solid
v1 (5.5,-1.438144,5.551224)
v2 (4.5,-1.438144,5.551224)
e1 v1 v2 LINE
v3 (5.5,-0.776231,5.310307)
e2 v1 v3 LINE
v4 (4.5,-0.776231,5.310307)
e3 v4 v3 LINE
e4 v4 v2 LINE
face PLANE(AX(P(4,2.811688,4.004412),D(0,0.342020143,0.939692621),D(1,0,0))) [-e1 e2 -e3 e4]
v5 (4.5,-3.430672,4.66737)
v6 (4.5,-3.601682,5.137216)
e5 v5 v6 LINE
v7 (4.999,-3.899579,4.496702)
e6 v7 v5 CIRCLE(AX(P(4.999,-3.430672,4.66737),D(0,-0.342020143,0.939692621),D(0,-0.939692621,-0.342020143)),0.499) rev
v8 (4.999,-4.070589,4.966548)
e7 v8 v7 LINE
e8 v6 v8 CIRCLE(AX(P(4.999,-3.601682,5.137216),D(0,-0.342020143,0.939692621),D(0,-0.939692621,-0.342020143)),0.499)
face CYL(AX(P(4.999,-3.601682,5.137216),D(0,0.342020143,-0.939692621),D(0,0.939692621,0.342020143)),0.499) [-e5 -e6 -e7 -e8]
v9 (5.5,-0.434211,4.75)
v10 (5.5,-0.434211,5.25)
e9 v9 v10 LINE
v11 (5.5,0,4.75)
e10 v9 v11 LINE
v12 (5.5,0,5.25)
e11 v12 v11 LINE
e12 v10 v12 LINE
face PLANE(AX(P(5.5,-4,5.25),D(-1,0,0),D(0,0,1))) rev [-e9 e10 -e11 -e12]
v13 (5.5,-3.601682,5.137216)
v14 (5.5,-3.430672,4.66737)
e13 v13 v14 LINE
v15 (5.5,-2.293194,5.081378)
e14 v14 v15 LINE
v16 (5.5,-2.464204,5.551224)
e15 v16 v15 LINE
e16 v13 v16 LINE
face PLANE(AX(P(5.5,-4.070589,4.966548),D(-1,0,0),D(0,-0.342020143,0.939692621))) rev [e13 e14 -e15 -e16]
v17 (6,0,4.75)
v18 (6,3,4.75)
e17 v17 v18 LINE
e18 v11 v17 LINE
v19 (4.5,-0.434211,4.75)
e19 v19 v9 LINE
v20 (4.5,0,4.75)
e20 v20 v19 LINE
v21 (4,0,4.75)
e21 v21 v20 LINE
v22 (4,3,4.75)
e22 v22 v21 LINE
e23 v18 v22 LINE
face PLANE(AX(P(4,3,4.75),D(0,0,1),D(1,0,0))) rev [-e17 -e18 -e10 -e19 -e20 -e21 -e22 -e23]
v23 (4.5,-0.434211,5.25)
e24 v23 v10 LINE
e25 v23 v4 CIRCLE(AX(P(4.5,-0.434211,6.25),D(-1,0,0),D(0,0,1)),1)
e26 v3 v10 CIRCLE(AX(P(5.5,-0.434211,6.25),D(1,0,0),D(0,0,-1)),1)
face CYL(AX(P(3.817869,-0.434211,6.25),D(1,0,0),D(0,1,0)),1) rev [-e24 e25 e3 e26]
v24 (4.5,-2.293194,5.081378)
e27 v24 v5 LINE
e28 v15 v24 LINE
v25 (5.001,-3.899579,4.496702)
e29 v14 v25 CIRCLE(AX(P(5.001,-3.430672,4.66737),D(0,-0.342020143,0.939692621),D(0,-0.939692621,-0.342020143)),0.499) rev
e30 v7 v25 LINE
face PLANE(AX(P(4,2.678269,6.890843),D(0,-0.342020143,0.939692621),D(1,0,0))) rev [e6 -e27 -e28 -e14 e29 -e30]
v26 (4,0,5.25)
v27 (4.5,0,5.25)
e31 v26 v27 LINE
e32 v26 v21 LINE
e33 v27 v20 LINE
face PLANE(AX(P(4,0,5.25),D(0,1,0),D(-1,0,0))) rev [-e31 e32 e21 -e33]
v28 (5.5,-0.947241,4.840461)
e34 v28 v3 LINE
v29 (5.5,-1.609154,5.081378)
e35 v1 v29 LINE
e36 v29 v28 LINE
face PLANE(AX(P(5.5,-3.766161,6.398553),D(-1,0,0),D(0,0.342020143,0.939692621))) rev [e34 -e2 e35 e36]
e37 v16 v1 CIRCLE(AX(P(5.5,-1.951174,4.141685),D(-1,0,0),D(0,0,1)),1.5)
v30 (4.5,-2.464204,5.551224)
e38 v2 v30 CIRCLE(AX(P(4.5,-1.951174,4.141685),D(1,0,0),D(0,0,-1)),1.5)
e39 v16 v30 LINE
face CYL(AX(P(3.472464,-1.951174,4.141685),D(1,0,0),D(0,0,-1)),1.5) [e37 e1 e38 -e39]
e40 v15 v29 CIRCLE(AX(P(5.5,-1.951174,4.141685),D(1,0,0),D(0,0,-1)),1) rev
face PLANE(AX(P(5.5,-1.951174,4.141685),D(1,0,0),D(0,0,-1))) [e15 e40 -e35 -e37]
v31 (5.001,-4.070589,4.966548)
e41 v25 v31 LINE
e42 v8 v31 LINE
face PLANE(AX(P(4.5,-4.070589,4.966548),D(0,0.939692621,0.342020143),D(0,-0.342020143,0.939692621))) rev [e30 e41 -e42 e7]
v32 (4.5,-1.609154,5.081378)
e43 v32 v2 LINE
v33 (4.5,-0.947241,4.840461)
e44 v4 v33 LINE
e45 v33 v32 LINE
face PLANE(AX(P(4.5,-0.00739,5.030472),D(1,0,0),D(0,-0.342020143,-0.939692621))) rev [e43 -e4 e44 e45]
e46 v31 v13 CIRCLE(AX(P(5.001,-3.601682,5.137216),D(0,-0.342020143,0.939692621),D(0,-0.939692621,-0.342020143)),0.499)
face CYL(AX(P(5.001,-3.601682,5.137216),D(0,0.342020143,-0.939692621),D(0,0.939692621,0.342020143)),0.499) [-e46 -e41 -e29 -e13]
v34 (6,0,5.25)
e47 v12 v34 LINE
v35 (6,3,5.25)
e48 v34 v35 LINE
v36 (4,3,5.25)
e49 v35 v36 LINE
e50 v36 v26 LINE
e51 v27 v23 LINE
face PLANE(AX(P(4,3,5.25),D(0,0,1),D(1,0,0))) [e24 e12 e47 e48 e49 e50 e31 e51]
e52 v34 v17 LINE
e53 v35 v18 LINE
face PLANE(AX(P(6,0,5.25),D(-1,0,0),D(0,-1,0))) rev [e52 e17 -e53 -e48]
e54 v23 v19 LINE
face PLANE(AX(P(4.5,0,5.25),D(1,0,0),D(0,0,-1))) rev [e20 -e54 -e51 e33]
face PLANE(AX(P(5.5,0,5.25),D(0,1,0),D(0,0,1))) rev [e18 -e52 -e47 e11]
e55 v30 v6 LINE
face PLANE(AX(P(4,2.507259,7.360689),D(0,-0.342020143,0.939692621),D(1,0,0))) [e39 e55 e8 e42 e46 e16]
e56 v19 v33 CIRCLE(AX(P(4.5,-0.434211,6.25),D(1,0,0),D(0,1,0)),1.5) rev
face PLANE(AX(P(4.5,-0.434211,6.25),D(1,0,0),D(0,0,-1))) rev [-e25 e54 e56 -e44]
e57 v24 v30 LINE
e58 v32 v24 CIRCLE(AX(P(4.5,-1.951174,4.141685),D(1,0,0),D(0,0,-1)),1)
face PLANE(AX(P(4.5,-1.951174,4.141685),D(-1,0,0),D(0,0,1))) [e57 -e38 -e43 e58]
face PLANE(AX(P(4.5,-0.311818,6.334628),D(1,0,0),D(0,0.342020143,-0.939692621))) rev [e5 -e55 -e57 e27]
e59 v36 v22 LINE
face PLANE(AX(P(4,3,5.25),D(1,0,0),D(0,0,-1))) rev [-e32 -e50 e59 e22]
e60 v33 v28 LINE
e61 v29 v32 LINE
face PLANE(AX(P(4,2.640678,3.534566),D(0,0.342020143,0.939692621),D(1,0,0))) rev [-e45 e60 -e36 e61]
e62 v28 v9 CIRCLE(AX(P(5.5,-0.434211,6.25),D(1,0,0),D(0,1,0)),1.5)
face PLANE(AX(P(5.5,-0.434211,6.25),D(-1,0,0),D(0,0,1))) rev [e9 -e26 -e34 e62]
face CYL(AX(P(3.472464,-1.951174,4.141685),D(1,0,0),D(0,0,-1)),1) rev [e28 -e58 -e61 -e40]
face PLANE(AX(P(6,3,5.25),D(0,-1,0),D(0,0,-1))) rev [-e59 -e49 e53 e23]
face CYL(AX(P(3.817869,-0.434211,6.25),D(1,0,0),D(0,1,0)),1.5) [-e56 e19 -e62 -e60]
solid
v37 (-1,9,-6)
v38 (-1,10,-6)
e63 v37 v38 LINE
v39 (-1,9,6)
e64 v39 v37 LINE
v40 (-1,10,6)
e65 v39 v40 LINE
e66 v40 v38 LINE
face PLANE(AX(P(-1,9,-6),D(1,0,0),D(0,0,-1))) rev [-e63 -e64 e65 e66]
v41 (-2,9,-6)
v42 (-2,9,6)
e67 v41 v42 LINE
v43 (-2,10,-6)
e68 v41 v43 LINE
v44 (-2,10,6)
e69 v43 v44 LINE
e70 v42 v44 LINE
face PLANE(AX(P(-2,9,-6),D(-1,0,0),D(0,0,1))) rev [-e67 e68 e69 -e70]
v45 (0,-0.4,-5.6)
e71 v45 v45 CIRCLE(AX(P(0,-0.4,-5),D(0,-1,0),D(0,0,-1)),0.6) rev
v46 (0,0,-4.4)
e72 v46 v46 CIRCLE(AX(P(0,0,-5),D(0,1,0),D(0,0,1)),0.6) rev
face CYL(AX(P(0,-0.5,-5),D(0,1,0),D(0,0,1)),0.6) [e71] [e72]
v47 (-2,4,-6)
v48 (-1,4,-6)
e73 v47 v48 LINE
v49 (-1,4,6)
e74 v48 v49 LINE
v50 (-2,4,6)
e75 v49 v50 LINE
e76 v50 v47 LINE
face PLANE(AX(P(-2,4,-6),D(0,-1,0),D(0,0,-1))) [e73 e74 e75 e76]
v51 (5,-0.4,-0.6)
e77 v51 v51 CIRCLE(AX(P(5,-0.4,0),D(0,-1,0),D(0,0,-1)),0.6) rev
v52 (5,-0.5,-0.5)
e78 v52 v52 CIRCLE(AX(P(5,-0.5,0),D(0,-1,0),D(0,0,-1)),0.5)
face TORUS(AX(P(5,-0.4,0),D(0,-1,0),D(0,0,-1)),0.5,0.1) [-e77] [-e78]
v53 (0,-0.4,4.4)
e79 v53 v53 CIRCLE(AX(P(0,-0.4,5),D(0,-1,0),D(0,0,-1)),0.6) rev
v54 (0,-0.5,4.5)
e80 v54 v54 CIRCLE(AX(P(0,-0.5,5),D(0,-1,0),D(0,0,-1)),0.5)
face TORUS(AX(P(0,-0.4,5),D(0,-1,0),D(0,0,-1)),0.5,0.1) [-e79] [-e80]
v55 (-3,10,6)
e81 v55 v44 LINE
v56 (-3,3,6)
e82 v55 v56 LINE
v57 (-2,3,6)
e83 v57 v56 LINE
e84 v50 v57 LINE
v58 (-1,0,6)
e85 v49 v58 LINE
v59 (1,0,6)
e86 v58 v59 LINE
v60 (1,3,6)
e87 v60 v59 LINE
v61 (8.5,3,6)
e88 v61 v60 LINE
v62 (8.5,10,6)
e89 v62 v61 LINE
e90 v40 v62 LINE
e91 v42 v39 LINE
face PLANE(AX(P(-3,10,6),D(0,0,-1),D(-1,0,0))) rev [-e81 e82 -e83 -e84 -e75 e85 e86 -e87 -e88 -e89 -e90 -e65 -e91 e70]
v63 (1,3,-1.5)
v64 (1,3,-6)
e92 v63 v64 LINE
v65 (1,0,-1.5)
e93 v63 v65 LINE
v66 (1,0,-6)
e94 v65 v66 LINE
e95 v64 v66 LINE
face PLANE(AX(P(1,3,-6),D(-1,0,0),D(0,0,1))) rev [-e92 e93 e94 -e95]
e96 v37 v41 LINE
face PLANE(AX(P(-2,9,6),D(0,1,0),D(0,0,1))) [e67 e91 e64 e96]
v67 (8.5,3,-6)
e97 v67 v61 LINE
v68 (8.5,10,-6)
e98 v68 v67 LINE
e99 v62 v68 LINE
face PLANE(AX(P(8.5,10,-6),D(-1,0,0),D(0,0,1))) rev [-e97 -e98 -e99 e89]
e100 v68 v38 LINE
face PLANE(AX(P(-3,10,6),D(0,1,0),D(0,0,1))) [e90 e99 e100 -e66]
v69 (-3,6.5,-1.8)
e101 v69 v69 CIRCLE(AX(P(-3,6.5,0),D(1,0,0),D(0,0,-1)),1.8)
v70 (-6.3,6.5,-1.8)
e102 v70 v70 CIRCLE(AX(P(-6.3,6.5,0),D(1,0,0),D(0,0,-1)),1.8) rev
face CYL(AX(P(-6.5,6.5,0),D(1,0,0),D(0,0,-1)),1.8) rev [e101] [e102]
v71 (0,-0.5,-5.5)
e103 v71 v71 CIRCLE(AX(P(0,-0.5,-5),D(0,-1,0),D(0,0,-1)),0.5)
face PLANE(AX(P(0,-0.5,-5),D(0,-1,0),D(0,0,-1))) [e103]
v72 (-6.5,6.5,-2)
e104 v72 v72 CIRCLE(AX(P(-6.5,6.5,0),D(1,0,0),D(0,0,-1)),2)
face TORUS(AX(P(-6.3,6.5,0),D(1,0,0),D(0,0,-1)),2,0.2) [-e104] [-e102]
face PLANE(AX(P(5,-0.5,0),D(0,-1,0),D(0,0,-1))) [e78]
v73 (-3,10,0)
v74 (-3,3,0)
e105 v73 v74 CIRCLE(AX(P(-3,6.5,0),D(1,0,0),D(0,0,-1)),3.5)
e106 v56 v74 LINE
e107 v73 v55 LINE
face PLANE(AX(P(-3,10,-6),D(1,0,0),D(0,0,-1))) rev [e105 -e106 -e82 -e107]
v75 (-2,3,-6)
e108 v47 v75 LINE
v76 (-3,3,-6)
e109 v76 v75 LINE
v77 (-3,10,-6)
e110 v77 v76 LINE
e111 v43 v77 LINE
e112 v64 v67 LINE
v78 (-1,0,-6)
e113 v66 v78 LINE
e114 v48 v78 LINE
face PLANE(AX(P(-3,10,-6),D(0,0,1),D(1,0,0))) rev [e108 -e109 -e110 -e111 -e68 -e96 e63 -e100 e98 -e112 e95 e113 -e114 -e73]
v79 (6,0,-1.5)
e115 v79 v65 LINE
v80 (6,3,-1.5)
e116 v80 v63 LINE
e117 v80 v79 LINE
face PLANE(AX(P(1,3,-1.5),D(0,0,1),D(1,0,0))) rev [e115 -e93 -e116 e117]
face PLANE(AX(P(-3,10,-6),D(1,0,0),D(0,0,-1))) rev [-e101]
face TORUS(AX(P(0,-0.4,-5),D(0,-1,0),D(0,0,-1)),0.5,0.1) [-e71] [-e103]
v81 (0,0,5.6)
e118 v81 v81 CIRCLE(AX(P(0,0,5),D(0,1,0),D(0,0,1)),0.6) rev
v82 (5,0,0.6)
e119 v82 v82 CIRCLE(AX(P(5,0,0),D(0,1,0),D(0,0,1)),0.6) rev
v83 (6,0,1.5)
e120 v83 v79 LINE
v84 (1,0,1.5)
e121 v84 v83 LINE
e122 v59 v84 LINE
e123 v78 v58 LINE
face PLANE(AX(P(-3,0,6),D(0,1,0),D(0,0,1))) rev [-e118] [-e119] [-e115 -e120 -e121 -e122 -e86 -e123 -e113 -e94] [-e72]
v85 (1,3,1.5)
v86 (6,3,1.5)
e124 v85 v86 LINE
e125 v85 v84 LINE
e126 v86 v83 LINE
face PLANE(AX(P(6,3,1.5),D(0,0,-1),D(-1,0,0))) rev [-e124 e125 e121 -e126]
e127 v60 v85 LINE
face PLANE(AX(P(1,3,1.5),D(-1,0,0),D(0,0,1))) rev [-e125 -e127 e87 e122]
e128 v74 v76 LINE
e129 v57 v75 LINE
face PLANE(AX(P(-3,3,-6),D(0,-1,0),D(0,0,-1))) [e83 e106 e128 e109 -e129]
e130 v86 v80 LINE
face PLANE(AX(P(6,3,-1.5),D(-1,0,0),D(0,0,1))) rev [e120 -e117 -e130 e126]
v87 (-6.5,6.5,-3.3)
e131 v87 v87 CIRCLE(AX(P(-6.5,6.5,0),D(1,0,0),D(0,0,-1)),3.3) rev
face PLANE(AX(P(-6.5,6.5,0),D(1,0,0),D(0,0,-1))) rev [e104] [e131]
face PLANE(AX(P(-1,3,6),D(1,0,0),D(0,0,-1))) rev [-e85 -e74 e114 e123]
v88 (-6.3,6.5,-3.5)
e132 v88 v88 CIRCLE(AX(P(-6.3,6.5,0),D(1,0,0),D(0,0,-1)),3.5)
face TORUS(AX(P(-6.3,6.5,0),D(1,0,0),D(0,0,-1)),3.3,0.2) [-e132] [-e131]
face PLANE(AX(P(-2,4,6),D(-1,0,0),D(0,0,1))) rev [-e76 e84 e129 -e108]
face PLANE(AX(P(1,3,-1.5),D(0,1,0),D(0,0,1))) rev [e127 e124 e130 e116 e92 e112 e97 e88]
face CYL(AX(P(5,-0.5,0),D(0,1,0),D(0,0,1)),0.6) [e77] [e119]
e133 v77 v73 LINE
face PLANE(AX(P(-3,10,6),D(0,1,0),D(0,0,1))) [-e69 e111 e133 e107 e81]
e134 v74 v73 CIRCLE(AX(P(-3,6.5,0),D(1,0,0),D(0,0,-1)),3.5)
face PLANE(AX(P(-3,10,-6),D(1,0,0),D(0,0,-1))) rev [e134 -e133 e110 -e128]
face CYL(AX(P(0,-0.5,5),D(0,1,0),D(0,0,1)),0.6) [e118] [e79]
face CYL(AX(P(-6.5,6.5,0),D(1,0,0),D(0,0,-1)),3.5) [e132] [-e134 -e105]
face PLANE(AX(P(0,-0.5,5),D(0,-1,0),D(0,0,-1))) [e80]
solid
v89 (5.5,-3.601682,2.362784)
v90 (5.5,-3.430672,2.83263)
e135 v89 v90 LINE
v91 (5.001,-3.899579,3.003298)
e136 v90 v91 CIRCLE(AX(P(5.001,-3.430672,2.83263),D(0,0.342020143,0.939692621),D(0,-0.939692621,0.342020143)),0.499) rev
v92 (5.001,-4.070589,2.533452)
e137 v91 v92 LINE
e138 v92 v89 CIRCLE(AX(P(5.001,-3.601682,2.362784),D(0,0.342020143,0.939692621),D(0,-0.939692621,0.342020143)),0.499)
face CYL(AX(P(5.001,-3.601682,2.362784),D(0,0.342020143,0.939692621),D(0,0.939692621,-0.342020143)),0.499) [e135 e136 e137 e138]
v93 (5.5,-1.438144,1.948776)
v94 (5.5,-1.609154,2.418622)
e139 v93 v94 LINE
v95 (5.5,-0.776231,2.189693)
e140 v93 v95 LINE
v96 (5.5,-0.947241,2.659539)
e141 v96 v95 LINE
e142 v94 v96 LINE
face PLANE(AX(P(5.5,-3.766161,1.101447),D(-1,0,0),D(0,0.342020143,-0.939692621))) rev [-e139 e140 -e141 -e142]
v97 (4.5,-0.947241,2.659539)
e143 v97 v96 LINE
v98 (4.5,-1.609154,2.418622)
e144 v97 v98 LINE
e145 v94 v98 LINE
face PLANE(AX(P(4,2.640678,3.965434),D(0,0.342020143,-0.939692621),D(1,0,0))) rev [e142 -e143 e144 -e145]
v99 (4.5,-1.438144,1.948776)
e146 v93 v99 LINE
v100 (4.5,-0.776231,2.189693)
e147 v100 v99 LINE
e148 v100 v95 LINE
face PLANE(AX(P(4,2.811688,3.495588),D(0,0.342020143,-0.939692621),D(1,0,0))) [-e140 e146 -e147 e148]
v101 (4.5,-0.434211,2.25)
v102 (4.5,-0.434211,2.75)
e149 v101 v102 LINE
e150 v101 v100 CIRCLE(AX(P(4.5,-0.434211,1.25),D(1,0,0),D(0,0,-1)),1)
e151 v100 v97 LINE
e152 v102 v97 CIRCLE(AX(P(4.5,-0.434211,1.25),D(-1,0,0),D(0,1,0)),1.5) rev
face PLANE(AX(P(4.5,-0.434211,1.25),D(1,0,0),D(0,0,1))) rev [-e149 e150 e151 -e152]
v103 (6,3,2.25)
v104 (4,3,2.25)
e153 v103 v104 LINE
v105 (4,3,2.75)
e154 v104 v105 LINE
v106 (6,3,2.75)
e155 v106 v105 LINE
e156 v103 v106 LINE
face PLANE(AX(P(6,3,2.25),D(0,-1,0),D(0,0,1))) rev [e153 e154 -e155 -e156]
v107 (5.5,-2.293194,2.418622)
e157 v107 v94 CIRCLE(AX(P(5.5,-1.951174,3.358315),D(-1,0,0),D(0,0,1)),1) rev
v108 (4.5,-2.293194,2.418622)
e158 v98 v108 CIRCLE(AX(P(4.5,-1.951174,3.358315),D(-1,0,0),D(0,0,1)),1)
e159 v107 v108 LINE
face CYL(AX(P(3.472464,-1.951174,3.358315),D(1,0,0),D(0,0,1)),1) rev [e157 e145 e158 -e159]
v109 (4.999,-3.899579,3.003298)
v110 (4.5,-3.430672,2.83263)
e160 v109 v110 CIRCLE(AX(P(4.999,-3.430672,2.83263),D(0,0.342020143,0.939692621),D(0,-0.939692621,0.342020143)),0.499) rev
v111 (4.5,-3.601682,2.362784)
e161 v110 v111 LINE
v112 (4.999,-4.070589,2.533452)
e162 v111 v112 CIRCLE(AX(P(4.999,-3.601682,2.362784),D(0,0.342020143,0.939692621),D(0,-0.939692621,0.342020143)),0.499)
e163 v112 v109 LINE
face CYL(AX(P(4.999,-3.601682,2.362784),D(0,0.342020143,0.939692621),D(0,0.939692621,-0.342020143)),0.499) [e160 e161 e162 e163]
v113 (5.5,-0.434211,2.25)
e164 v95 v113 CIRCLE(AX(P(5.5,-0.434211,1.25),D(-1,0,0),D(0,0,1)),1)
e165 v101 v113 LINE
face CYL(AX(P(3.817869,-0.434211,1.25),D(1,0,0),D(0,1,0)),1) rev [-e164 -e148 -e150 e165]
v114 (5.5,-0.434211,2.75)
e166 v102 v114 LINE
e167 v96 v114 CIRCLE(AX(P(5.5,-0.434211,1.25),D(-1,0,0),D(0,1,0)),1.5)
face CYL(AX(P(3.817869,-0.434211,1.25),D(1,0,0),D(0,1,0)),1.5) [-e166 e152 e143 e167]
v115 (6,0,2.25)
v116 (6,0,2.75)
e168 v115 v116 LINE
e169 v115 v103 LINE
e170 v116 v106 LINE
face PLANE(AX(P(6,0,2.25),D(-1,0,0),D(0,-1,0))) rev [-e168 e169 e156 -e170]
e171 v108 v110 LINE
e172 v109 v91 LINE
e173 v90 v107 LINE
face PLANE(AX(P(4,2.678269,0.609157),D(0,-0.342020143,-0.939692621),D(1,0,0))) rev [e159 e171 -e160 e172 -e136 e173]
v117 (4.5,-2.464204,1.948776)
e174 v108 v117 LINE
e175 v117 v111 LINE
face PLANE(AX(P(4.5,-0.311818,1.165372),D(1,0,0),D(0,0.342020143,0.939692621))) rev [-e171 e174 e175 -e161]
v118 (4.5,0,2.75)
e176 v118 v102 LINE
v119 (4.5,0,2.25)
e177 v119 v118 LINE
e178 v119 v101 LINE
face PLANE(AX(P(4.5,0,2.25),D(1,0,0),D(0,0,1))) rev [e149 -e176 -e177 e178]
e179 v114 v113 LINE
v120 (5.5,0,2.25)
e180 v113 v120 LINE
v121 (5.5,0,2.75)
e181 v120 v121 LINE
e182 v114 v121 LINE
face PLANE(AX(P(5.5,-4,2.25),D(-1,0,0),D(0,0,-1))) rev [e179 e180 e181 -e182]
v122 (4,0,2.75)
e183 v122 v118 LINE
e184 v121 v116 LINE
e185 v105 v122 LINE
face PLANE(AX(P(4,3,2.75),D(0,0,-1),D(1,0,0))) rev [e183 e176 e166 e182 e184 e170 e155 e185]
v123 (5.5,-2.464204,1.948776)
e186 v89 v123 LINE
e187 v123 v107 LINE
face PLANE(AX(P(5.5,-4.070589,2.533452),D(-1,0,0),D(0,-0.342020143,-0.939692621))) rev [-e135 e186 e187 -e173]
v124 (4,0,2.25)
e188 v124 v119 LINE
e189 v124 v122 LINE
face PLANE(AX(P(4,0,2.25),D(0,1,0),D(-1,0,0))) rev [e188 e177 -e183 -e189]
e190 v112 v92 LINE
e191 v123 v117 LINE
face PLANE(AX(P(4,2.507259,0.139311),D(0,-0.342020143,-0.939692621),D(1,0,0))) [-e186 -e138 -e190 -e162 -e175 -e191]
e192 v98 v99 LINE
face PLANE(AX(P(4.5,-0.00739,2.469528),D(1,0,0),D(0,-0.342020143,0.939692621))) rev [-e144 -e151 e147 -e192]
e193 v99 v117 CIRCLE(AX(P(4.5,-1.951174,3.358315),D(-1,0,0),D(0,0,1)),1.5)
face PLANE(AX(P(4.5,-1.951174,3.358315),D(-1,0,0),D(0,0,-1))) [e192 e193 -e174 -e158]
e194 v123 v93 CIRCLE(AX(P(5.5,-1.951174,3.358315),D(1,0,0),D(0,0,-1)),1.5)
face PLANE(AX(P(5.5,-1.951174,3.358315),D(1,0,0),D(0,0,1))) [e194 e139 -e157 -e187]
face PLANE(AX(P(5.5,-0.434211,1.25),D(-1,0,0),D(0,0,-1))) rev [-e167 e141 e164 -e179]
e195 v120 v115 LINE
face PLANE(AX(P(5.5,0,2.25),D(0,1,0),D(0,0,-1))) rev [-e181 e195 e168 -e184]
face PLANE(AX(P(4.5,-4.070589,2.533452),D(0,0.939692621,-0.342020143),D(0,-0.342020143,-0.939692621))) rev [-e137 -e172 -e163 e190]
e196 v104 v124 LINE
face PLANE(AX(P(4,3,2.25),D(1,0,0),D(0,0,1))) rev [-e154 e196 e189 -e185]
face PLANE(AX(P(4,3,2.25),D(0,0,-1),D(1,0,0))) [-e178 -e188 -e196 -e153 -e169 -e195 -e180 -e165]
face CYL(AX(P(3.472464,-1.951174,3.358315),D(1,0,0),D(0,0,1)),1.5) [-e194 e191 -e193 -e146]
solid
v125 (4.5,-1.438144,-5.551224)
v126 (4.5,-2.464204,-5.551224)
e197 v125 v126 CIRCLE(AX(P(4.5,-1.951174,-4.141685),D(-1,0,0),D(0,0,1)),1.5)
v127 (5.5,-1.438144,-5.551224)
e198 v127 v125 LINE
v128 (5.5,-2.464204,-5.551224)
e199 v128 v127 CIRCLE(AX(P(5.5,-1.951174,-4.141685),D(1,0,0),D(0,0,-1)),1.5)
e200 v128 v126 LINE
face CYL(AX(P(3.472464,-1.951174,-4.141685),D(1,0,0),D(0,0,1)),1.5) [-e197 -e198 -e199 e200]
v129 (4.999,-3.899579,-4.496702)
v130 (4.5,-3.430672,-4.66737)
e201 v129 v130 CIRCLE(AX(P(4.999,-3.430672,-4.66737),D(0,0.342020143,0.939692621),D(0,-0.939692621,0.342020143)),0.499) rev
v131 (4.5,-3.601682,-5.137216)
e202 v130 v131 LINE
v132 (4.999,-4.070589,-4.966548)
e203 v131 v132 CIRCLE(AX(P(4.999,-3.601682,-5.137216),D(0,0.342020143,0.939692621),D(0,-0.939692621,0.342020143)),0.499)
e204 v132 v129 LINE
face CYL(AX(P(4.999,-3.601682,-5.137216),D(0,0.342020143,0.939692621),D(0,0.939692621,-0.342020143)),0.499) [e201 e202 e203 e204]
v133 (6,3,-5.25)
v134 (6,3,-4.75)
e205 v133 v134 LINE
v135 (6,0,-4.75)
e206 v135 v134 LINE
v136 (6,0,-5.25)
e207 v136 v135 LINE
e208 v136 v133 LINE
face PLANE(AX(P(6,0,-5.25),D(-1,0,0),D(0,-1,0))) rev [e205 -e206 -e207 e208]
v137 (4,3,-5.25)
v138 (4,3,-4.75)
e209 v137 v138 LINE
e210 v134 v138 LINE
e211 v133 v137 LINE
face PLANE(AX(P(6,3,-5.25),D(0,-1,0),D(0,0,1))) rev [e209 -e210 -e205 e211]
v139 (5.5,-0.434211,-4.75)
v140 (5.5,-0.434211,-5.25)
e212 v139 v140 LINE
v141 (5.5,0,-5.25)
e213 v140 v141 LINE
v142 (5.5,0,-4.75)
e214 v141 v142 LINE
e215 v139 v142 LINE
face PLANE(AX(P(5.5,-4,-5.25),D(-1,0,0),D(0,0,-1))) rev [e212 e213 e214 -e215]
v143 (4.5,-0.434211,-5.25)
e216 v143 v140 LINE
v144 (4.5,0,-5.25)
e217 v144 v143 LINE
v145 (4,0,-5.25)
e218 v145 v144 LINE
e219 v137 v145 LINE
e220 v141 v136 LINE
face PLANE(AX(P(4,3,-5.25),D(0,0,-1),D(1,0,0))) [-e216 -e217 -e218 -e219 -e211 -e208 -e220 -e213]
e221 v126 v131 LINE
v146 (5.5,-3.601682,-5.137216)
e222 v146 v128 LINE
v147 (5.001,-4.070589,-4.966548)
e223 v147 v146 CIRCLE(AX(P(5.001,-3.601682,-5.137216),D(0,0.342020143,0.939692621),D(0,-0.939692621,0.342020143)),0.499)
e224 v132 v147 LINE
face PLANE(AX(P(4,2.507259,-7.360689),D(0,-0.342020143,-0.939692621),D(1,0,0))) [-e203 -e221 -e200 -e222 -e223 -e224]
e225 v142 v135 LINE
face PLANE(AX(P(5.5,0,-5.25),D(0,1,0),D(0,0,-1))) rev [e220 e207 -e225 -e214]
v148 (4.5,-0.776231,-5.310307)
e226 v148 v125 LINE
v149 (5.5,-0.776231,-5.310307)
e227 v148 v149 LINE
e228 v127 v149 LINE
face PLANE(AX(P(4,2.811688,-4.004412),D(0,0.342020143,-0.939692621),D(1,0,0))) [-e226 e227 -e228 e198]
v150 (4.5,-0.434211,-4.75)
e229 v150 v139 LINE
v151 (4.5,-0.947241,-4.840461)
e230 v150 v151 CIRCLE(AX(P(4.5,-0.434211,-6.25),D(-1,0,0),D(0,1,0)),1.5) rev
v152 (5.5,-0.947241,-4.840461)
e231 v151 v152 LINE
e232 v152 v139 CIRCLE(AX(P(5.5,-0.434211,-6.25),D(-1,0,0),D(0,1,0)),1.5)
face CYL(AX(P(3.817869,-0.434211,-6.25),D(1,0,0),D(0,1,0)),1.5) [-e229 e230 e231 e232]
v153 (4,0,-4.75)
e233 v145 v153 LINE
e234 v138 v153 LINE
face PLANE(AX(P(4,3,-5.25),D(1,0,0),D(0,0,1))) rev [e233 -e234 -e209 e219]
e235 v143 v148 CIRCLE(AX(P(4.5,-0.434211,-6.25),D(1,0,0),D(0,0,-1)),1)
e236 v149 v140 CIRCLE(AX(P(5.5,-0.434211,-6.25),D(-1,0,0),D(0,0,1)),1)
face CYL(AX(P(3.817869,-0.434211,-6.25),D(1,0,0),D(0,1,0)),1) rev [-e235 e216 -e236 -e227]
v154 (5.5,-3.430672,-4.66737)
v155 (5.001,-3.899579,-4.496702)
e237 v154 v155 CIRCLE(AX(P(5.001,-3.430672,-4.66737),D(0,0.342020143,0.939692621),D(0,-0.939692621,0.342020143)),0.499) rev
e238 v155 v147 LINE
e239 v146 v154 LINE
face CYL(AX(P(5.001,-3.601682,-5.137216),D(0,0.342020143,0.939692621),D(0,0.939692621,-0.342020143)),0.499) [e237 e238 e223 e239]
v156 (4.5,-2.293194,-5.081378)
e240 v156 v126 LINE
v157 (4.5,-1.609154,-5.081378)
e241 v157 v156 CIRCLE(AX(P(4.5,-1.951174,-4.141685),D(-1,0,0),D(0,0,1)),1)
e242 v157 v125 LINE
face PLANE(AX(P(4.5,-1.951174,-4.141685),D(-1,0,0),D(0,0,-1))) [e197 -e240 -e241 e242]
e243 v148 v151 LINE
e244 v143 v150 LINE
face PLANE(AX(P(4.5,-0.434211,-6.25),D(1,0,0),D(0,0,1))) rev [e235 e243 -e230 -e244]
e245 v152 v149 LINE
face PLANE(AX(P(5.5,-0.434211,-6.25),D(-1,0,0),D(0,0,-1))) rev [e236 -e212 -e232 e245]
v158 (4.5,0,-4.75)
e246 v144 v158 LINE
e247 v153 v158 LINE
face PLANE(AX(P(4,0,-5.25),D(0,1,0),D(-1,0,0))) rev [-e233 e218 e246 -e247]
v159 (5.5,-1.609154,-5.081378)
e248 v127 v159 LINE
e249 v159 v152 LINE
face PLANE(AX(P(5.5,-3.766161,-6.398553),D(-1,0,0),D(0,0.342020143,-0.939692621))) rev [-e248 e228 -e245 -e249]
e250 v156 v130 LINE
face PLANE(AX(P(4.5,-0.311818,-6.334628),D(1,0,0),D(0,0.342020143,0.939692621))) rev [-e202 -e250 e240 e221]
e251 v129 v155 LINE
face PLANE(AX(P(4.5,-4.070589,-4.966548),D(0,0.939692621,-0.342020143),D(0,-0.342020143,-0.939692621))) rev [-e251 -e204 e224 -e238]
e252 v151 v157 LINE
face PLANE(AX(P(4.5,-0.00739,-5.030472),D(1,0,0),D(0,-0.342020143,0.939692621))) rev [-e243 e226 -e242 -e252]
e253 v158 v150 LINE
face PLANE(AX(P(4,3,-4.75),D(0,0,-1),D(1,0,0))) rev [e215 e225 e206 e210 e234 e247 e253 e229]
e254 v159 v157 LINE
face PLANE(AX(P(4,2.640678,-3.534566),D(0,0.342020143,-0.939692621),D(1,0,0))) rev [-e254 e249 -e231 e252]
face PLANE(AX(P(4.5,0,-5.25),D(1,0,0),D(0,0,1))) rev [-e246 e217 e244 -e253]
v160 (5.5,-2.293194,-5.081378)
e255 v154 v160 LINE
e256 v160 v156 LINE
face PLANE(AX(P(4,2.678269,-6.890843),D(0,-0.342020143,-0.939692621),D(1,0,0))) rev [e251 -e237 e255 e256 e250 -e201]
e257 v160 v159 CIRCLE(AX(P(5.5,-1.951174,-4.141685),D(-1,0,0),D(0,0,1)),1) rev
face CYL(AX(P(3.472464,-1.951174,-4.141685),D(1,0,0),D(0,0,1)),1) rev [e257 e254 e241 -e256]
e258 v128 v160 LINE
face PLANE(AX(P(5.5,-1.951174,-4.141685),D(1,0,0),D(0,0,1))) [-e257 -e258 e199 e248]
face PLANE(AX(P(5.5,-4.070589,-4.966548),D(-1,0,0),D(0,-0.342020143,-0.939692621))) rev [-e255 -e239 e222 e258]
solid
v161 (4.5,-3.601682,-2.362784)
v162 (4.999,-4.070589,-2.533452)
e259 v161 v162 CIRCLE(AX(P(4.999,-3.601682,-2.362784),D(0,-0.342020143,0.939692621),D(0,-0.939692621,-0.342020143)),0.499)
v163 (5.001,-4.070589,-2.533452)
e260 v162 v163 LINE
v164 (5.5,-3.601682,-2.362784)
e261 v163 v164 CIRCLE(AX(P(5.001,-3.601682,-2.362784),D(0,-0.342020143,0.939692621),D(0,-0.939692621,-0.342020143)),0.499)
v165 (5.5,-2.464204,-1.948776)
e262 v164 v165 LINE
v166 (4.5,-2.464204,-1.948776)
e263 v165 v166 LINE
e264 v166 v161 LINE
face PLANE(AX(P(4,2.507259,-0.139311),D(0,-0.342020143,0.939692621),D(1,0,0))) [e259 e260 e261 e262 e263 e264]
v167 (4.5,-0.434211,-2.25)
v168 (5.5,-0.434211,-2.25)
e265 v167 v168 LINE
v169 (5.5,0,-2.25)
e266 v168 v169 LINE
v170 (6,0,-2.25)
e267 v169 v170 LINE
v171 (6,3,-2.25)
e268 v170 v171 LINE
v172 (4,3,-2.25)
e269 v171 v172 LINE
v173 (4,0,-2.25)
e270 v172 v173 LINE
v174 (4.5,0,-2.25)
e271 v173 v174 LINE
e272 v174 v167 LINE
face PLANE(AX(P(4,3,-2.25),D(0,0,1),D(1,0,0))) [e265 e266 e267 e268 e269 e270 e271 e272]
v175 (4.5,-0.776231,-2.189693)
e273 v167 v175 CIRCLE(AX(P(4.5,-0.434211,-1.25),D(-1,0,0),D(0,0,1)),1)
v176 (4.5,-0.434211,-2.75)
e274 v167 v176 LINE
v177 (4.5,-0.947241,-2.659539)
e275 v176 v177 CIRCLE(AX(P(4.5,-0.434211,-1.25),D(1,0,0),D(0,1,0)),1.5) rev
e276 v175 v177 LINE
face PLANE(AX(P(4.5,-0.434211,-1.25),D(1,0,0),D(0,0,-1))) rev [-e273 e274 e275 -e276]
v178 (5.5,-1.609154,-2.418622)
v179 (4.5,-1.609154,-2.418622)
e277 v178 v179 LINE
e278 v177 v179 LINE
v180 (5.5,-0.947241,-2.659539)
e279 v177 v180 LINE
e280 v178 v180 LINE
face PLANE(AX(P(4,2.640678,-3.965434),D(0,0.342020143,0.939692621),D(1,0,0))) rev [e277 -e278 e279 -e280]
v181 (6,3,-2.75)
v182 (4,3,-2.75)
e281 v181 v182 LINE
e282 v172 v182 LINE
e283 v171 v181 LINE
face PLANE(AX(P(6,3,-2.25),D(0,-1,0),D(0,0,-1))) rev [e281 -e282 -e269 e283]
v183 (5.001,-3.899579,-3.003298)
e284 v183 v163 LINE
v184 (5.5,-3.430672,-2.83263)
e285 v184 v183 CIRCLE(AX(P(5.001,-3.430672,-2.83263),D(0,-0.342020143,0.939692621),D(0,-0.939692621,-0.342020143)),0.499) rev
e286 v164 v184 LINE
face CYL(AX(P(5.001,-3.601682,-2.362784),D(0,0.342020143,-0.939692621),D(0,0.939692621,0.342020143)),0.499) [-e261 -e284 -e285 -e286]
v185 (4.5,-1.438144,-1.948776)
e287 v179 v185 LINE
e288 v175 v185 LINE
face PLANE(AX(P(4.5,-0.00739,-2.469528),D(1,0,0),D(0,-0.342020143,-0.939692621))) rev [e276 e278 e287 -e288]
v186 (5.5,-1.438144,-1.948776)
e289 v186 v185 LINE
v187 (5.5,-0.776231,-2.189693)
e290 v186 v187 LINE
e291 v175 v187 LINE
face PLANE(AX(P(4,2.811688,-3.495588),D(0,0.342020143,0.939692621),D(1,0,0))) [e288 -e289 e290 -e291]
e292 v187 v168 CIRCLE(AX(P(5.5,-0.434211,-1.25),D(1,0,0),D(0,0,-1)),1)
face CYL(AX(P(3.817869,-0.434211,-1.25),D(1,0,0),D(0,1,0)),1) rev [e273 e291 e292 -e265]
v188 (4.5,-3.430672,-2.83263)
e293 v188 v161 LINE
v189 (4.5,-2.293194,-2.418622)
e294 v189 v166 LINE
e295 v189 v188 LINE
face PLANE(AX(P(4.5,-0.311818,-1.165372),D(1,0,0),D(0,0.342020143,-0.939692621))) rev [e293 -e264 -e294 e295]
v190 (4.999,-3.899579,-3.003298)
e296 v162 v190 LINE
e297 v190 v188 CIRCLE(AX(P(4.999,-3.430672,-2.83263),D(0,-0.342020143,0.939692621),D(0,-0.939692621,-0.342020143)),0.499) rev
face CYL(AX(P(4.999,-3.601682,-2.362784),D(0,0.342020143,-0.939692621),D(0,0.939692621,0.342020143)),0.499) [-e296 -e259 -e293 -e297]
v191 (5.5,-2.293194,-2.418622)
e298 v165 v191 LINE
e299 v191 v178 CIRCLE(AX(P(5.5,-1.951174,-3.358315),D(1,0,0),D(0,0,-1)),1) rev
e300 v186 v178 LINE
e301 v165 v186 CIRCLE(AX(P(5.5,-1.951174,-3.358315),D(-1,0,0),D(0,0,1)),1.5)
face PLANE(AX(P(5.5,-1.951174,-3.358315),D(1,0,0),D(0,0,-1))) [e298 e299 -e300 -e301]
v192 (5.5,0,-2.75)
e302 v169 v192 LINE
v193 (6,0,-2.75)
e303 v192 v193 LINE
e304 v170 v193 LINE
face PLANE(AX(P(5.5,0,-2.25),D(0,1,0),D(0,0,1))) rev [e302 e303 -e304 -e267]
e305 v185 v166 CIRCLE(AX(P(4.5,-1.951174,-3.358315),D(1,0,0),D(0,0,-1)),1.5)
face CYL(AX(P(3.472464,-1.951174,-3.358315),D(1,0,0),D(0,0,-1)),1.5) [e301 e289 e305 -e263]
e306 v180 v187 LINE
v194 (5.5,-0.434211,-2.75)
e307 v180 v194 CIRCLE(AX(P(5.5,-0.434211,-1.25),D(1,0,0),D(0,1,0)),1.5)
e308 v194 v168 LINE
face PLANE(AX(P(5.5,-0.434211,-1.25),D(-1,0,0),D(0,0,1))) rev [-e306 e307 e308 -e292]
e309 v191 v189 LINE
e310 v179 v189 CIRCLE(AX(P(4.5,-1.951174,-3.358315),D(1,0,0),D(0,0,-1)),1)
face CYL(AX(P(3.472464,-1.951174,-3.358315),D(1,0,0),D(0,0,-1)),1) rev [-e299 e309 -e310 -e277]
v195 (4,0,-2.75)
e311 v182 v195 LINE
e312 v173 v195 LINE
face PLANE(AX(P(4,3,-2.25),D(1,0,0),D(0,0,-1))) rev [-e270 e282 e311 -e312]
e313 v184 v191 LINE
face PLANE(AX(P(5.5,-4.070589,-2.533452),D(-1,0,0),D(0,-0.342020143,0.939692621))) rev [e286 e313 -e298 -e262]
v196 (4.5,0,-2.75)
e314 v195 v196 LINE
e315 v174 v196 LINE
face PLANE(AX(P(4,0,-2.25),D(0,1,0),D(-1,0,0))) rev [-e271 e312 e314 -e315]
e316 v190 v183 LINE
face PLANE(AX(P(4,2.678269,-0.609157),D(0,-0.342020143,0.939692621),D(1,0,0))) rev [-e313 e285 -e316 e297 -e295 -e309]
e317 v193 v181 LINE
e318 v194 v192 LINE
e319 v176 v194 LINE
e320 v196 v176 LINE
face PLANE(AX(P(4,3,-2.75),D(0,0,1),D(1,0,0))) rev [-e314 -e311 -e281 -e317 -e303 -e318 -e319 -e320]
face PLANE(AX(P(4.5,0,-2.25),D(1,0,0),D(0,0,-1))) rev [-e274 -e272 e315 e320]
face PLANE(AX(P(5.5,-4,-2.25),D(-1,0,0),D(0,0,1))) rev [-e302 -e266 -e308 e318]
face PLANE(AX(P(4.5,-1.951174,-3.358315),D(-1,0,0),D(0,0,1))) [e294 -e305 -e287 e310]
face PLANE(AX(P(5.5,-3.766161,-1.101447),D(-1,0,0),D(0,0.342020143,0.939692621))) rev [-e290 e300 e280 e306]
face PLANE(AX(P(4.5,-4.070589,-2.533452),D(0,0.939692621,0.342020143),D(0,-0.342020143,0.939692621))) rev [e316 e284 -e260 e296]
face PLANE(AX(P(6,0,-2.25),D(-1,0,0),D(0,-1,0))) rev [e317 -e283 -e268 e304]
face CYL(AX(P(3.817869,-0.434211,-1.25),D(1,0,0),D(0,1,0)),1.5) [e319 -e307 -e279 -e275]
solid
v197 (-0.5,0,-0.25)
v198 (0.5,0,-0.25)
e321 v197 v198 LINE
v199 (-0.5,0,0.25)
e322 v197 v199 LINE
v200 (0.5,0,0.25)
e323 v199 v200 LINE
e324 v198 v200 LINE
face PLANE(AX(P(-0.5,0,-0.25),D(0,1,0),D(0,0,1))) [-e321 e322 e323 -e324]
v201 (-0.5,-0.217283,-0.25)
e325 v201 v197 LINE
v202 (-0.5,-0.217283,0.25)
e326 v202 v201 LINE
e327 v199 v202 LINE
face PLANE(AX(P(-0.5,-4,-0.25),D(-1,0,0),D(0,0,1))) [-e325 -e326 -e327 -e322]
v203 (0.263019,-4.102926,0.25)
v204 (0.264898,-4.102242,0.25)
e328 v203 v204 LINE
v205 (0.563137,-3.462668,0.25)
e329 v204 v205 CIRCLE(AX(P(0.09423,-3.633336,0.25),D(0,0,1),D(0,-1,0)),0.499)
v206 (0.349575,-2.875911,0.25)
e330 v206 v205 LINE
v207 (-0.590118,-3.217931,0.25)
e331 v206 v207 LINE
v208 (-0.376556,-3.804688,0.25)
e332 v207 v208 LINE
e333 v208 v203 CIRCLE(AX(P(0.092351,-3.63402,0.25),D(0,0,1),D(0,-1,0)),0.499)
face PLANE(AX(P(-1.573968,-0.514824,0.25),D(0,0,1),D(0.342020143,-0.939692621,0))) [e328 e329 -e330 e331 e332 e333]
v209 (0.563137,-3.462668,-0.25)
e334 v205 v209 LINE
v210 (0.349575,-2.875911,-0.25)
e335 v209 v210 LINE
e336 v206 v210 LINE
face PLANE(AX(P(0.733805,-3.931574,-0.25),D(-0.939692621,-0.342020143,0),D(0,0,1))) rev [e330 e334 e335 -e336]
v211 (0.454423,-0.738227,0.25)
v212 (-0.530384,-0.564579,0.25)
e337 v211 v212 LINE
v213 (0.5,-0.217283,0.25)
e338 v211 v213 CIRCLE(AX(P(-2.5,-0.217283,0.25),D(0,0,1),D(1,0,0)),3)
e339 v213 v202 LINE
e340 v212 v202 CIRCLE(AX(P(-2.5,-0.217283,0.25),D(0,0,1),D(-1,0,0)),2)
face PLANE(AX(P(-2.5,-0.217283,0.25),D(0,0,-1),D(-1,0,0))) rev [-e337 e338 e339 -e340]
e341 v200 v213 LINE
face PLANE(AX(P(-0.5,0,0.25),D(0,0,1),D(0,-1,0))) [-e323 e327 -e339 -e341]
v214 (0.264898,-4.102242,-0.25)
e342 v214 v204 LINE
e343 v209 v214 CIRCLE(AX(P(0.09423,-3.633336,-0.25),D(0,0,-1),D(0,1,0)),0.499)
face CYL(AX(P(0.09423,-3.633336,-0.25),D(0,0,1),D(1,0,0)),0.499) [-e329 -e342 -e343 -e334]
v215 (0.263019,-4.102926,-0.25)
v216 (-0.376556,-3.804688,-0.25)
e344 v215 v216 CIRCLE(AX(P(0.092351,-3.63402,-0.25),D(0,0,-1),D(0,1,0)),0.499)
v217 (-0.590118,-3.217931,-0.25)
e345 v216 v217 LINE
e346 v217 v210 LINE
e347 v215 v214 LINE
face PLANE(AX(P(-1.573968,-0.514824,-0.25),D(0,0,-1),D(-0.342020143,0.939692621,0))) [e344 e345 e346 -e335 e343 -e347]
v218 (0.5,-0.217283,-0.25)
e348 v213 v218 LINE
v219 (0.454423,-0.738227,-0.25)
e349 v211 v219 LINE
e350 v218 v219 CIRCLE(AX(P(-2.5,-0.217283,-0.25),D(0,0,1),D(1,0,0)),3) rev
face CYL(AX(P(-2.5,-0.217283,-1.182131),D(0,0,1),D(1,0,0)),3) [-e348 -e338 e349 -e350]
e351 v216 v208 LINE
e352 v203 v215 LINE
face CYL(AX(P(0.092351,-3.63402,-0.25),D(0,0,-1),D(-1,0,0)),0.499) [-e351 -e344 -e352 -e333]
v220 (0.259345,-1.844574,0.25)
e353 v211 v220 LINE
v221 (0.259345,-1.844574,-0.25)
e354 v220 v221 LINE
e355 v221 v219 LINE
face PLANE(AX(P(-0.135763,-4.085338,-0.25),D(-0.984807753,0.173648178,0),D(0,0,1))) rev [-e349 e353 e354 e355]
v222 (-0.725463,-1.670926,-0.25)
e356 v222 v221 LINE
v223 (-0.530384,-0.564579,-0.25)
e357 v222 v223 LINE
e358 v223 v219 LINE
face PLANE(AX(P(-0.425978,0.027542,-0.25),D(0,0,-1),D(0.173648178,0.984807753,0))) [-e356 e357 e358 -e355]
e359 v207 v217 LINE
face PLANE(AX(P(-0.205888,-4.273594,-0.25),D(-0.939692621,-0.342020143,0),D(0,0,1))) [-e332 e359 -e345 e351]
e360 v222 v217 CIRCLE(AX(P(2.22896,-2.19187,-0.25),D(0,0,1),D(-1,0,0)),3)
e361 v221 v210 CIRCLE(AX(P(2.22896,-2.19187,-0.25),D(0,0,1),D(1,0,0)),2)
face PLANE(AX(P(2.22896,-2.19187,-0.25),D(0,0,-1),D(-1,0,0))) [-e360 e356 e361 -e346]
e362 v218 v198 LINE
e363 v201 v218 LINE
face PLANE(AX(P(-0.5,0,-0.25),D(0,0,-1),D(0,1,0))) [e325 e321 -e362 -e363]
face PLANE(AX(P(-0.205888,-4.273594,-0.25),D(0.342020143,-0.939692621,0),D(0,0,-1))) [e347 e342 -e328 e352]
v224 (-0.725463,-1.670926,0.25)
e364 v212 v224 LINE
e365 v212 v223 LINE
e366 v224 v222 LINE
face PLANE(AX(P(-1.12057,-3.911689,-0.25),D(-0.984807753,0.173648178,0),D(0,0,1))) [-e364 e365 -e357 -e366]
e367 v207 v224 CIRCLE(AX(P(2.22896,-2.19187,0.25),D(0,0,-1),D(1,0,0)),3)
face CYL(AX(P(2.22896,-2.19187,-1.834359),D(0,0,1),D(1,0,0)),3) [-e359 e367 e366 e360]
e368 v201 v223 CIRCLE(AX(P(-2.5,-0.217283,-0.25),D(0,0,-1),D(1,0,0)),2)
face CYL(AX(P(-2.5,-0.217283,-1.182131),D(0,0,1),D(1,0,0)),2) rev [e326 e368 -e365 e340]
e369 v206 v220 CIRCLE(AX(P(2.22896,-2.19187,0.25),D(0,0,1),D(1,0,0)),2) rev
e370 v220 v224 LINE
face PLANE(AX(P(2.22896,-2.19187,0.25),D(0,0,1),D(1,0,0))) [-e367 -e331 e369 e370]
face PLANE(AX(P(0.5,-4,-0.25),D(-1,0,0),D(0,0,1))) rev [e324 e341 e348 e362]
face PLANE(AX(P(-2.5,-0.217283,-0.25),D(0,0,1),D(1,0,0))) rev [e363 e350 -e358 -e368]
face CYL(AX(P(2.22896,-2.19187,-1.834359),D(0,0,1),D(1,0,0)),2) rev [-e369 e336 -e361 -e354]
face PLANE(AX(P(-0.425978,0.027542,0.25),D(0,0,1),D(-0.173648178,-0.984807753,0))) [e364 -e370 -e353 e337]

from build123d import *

# Parameters (mm, degrees)
SKETCH1_W              = 11.5
SKETCH1_H              = 12
EXTRUDE_1195_DEPTH     = 10
SKETCH4_R              = 3.5
SKETCH4_R_2            = 1.8
EXTRUDE_1407_DEPTH     = 3.5
FILLET_2_R             = 0.2
SKETCH_4_W             = 1
SKETCH_4_H             = 12
CUT_EXTRUDE_1856_DEPTH = 1
SKETCH_12_W            = 2
SKETCH_12_H            = 12
CUT_EXTRUDE_2188_DEPTH = 3
CUT_EXTRUDE_2633_DEPTH = 3
SKETCH_20_W            = 1
SKETCH_20_H            = 12
CUT_EXTRUDE_2_DEPTH    = 1
SKETCH3_R              = 0.6
EXTRUDE_3429_DEPTH     = 0.5
FILLET_4_R             = 0.1
SM_BASE_FLANGE_1_DEPTH = 0.5
OTHER_START            = 4.5
OTHER_8_DEPTH          = 1
OTHER_8_2_DEPTH        = 1
OTHER_9_DEPTH          = 1
OTHER_9_2_DEPTH        = 1
FILLET_5_R             = 0.499
SKETCH_42_W            = 0.5
SKETCH_42_H            = 4
SM_BASE_FLANGE_3_DEPTH = 1
OTHER_START_2          = -0.25
OTHER_19_DEPTH         = 0.5
OTHER_19_2_DEPTH       = 0.5
OTHER_20_DEPTH         = 0.5
OTHER_20_2_DEPTH       = 0.5
FILLET_6_R             = 0.499


# Read off the part's stored shape, not the designer's step: Нарисованный сгиб8, Нарисованный сгиб9, Нарисованный сгиб19, Нарисованный сгиб20
# Sheet-metal steps are written as plain solids
with BuildPart() as part:
    # Sketch1 → Extrude 1195 (new body)
    with BuildSketch(Plane(origin=(0, 0, 0), x_dir=(1, 0, 0), z_dir=(0, 1, 0))):
        with Locations((2.75, 0)):
            Rectangle(SKETCH1_W, SKETCH1_H)
    extrude(amount=EXTRUDE_1195_DEPTH)

    # Sketch4 → Extrude 1407 (add)
    with BuildSketch(Plane(origin=(-3, 0, 0), x_dir=(0, 0, -1), z_dir=(1, 0, 0))):
        with Locations((0, 6.5)):
            Circle(SKETCH4_R)
        with Locations((0, 6.5)):
            Circle(SKETCH4_R_2, mode=Mode.SUBTRACT)
    extrude(amount=-EXTRUDE_1407_DEPTH)

    # Скругление2
    fillet_2_edges = [part.edges().sort_by_distance(p)[0] for p in [
        (-6.5, 6.5, 3.5),
        (-6.5, 6.5, 1.8),
    ]]
    fillet(fillet_2_edges, radius=FILLET_2_R)

    # Эскиз4 → Cut-Extrude 1856 (cut)
    with BuildSketch(Plane(origin=(0, 10, 0), x_dir=(1, 0, 0), z_dir=(0, 1, 0))):
        with Locations((-1.5, 0)):
            Rectangle(SKETCH_4_W, SKETCH_4_H)
    extrude(amount=-CUT_EXTRUDE_1856_DEPTH, mode=Mode.SUBTRACT)

    # Эскиз12 → Cut-Extrude 2188 (cut)
    with BuildSketch(Plane.XZ):
        with Locations((-2, 0)):
            Rectangle(SKETCH_12_W, SKETCH_12_H)
    extrude(amount=-CUT_EXTRUDE_2188_DEPTH, mode=Mode.SUBTRACT)

    # Эскиз13 → Cut-Extrude 2633 (cut)
    with BuildSketch(Plane.XZ):
        Polygon((1, -6), (8.5, -6), (8.5, 6), (1, 6), (1, 1.5), (6, 1.5), (6, -1.5), (1, -1.5), align=None)
    extrude(amount=-CUT_EXTRUDE_2633_DEPTH, mode=Mode.SUBTRACT)

    # Эскиз20 → Нижний паз 2 (cut)
    with BuildSketch(Plane.XZ.offset(-3)):
        with Locations((-1.5, 0)):
            Rectangle(SKETCH_20_W, SKETCH_20_H)
    extrude(amount=-CUT_EXTRUDE_2_DEPTH, mode=Mode.SUBTRACT)

    # Sketch3 → Extrude 3429 (add)
    with BuildSketch(Plane.XZ):
        with Locations(Location((0, 5, 0), (0, 0, 90))):
            Circle(SKETCH3_R)
        with Locations(Location((5, 0, 0), (0, 0, 90))):
            Circle(SKETCH3_R)
        with Locations(Location((0, -5, 0), (0, 0, 90))):
            Circle(SKETCH3_R)
    extrude(amount=EXTRUDE_3429_DEPTH)

    # Скругление4
    fillet_4_edges = [part.edges().sort_by_distance(p)[0] for p in [
        (0, -0.5, 4.4),
        (5, -0.5, -0.6),
        (0, -0.5, -5.6),
    ]]
    fillet(fillet_4_edges, radius=FILLET_4_R)


with BuildPart() as body_2:
    # Эскиз23 → Базовая кромка1 (new body)
    with BuildSketch(Plane.XY.offset(4.75)):
        Polygon((4, 3), (4, 0), (4.5, 0), (4.5, -4), (5.5, -4), (5.5, 0), (6, 0), (6, 3), align=None)
    extrude(amount=SM_BASE_FLANGE_1_DEPTH)

    # Other 8 outline → Other 8 (cut)
    with BuildSketch(Plane.YZ.offset(OTHER_START)):
        with BuildLine():
            ThreePointArc((-0.434210549, 4.75), (-0.694682816, 4.77278837), (-0.947240764, 4.840461069))
            Line((-0.947240764, 4.840461069), (-2.07243973, 5.25))
            Line((-2.07243973, 5.25), (-4, 5.25))
            Line((-4, 5.25), (-4, 4.75))
            Line((-4, 4.75), (-0.434210549, 4.75))
        make_face()
    extrude(amount=OTHER_8_DEPTH, mode=Mode.SUBTRACT)

    # Other 8 2 outline → Other 8 2 (add)
    with BuildSketch(Plane.YZ.offset(OTHER_START)):
        with BuildLine():
            Line((-3.937170734, 5.92870658), (-2.07243973, 5.25))
            Line((-2.07243973, 5.25), (-0.434210549, 5.25))
            ThreePointArc((-0.434210549, 5.25), (-0.607858727, 5.265192247), (-0.776230693, 5.310307379))
            Line((-0.776230693, 5.310307379), (-3.766160663, 6.398552891))
            Line((-3.766160663, 6.398552891), (-3.937170734, 5.92870658))
        make_face()
    extrude(amount=OTHER_8_2_DEPTH)

    # Other 9 outline → Other 9 (cut)
    with BuildSketch(Plane.YZ.offset(OTHER_START)):
        with BuildLine():
            ThreePointArc((-2.464204349, 5.551224091), (-1.951174134, 5.64168516), (-1.438143919, 5.551224091))
            Line((-1.438143919, 5.551224091), (-3.766160663, 6.398552891))
            Line((-3.766160663, 6.398552891), (-3.937170734, 5.92870658))
            Line((-3.937170734, 5.92870658), (-2.682125234, 5.471907376))
            Line((-2.682125234, 5.471907376), (-2.464204349, 5.551224091))
        make_face()
    extrude(amount=OTHER_9_DEPTH, mode=Mode.SUBTRACT)

    # Other 9 2 outline → Other 9 2 (add)
    with BuildSketch(Plane.YZ.offset(OTHER_START)):
        with BuildLine():
            Line((-1.609153991, 5.081377781), (-2.682125234, 5.471907376))
            Line((-2.682125234, 5.471907376), (-4.070588964, 4.966547907))
            Line((-4.070588964, 4.966547907), (-3.899578893, 4.496701596))
            Line((-3.899578893, 4.496701596), (-2.293194277, 5.081377781))
            ThreePointArc((-2.293194277, 5.081377781), (-1.951174134, 5.14168516), (-1.609153991, 5.081377781))
        make_face()
    extrude(amount=OTHER_9_2_DEPTH)

    # Скругление5
    fillet_5_edges = [body_2.edges().sort_by_distance(p)[0] for p in [
        (4.5, -3.985083928, 4.731624752),
        (5.5, -3.985083928, 4.731624752),
    ]]
    fillet(fillet_5_edges, radius=FILLET_5_R)


with BuildPart() as body_3:
    # Зеркальное отражение1: mirrored copy
    add(body_2.part.mirror(Plane.XY.offset(3.75)))


with BuildPart() as body_4:
    # Зеркальное отражение2: mirrored copy
    add(body_2.part.mirror(Plane.XY))


with BuildPart() as body_5:
    # Mirror 2 2: mirrored copy
    add(body_3.part.mirror(Plane.XY))


with BuildPart() as body_6:
    # Эскиз42 → Базовая кромка3 (new body)
    with BuildSketch(Plane(origin=(0.5, 0, 0), x_dir=(0, 0, -1), z_dir=(1, 0, 0))):
        with Locations((0, -2)):
            Rectangle(SKETCH_42_W, SKETCH_42_H)
    extrude(amount=-SM_BASE_FLANGE_3_DEPTH)

    # Other 19 outline → Other 19 (cut)
    with BuildSketch(Plane.XY.offset(OTHER_START_2)):
        with BuildLine():
            Line((0.454423259, -0.738227417), (-0.120715252, -4))
            Line((-0.120715252, -4), (0.5, -4))
            Line((0.5, -4), (0.5, -0.217282884))
            ThreePointArc((0.5, -0.217282884), (0.488584094, -0.478750112), (0.454423259, -0.738227417))
        make_face()
    extrude(amount=OTHER_19_DEPTH, mode=Mode.SUBTRACT)

    # Other 19 2 outline → Other 19 2 (add)
    with BuildSketch(Plane.XY.offset(OTHER_START_2)):
        with BuildLine():
            ThreePointArc((-0.5, -0.217282884), (-0.507610604, -0.391594369), (-0.530384494, -0.564579239))
            Line((-0.530384494, -0.564579239), (-1.120570314, -3.911689351))
            Line((-1.120570314, -3.911689351), (-0.135762561, -4.085337529))
            Line((-0.135762561, -4.085337529), (-0.120715252, -4))
            Line((-0.120715252, -4), (-0.5, -4))
            Line((-0.5, -4), (-0.5, -0.217282884))
        make_face()
    extrude(amount=OTHER_19_2_DEPTH)

    # Other 20 outline → Other 20 (cut)
    with BuildSketch(Plane.XY.offset(OTHER_START_2)):
        with BuildLine():
            ThreePointArc((-0.590117837, -3.217930711), (-0.759624069, -2.453337509), (-0.725463234, -1.670925748))
            Line((-0.725463234, -1.670925748), (-1.120570314, -3.911689351))
            Line((-1.120570314, -3.911689351), (-0.283915714, -4.059214131))
            Line((-0.283915714, -4.059214131), (-0.590117837, -3.217930711))
        make_face()
    extrude(amount=OTHER_20_DEPTH, mode=Mode.SUBTRACT)

    # Other 20 2 outline → Other 20 2 (add)
    with BuildSketch(Plane.XY.offset(OTHER_START_2)):
        with BuildLine():
            Line((-0.135762561, -4.085337529), (-0.283915714, -4.059214131))
            Line((-0.283915714, -4.059214131), (-0.205887727, -4.273594263))
            Line((-0.205887727, -4.273594263), (0.733804894, -3.93157412))
            Line((0.733804894, -3.93157412), (0.349574784, -2.875910568))
            ThreePointArc((0.349574784, -2.875910568), (0.236570629, -2.366181767), (0.259344519, -1.844573926))
            Line((0.259344519, -1.844573926), (-0.135762561, -4.085337529))
        make_face()
    extrude(amount=OTHER_20_2_DEPTH)

    # Скругление6
    fillet_6_edges = [body_6.edges().sort_by_distance(p)[0] for p in [
        (-0.205887727, -4.273594263, 0),
        (0.733804894, -3.93157412, 0),
    ]]
    fillet(fillet_6_edges, radius=FILLET_6_R)


solid = Compound([part.part, body_2.part, body_3.part, body_4.part, body_5.part, body_6.part])
